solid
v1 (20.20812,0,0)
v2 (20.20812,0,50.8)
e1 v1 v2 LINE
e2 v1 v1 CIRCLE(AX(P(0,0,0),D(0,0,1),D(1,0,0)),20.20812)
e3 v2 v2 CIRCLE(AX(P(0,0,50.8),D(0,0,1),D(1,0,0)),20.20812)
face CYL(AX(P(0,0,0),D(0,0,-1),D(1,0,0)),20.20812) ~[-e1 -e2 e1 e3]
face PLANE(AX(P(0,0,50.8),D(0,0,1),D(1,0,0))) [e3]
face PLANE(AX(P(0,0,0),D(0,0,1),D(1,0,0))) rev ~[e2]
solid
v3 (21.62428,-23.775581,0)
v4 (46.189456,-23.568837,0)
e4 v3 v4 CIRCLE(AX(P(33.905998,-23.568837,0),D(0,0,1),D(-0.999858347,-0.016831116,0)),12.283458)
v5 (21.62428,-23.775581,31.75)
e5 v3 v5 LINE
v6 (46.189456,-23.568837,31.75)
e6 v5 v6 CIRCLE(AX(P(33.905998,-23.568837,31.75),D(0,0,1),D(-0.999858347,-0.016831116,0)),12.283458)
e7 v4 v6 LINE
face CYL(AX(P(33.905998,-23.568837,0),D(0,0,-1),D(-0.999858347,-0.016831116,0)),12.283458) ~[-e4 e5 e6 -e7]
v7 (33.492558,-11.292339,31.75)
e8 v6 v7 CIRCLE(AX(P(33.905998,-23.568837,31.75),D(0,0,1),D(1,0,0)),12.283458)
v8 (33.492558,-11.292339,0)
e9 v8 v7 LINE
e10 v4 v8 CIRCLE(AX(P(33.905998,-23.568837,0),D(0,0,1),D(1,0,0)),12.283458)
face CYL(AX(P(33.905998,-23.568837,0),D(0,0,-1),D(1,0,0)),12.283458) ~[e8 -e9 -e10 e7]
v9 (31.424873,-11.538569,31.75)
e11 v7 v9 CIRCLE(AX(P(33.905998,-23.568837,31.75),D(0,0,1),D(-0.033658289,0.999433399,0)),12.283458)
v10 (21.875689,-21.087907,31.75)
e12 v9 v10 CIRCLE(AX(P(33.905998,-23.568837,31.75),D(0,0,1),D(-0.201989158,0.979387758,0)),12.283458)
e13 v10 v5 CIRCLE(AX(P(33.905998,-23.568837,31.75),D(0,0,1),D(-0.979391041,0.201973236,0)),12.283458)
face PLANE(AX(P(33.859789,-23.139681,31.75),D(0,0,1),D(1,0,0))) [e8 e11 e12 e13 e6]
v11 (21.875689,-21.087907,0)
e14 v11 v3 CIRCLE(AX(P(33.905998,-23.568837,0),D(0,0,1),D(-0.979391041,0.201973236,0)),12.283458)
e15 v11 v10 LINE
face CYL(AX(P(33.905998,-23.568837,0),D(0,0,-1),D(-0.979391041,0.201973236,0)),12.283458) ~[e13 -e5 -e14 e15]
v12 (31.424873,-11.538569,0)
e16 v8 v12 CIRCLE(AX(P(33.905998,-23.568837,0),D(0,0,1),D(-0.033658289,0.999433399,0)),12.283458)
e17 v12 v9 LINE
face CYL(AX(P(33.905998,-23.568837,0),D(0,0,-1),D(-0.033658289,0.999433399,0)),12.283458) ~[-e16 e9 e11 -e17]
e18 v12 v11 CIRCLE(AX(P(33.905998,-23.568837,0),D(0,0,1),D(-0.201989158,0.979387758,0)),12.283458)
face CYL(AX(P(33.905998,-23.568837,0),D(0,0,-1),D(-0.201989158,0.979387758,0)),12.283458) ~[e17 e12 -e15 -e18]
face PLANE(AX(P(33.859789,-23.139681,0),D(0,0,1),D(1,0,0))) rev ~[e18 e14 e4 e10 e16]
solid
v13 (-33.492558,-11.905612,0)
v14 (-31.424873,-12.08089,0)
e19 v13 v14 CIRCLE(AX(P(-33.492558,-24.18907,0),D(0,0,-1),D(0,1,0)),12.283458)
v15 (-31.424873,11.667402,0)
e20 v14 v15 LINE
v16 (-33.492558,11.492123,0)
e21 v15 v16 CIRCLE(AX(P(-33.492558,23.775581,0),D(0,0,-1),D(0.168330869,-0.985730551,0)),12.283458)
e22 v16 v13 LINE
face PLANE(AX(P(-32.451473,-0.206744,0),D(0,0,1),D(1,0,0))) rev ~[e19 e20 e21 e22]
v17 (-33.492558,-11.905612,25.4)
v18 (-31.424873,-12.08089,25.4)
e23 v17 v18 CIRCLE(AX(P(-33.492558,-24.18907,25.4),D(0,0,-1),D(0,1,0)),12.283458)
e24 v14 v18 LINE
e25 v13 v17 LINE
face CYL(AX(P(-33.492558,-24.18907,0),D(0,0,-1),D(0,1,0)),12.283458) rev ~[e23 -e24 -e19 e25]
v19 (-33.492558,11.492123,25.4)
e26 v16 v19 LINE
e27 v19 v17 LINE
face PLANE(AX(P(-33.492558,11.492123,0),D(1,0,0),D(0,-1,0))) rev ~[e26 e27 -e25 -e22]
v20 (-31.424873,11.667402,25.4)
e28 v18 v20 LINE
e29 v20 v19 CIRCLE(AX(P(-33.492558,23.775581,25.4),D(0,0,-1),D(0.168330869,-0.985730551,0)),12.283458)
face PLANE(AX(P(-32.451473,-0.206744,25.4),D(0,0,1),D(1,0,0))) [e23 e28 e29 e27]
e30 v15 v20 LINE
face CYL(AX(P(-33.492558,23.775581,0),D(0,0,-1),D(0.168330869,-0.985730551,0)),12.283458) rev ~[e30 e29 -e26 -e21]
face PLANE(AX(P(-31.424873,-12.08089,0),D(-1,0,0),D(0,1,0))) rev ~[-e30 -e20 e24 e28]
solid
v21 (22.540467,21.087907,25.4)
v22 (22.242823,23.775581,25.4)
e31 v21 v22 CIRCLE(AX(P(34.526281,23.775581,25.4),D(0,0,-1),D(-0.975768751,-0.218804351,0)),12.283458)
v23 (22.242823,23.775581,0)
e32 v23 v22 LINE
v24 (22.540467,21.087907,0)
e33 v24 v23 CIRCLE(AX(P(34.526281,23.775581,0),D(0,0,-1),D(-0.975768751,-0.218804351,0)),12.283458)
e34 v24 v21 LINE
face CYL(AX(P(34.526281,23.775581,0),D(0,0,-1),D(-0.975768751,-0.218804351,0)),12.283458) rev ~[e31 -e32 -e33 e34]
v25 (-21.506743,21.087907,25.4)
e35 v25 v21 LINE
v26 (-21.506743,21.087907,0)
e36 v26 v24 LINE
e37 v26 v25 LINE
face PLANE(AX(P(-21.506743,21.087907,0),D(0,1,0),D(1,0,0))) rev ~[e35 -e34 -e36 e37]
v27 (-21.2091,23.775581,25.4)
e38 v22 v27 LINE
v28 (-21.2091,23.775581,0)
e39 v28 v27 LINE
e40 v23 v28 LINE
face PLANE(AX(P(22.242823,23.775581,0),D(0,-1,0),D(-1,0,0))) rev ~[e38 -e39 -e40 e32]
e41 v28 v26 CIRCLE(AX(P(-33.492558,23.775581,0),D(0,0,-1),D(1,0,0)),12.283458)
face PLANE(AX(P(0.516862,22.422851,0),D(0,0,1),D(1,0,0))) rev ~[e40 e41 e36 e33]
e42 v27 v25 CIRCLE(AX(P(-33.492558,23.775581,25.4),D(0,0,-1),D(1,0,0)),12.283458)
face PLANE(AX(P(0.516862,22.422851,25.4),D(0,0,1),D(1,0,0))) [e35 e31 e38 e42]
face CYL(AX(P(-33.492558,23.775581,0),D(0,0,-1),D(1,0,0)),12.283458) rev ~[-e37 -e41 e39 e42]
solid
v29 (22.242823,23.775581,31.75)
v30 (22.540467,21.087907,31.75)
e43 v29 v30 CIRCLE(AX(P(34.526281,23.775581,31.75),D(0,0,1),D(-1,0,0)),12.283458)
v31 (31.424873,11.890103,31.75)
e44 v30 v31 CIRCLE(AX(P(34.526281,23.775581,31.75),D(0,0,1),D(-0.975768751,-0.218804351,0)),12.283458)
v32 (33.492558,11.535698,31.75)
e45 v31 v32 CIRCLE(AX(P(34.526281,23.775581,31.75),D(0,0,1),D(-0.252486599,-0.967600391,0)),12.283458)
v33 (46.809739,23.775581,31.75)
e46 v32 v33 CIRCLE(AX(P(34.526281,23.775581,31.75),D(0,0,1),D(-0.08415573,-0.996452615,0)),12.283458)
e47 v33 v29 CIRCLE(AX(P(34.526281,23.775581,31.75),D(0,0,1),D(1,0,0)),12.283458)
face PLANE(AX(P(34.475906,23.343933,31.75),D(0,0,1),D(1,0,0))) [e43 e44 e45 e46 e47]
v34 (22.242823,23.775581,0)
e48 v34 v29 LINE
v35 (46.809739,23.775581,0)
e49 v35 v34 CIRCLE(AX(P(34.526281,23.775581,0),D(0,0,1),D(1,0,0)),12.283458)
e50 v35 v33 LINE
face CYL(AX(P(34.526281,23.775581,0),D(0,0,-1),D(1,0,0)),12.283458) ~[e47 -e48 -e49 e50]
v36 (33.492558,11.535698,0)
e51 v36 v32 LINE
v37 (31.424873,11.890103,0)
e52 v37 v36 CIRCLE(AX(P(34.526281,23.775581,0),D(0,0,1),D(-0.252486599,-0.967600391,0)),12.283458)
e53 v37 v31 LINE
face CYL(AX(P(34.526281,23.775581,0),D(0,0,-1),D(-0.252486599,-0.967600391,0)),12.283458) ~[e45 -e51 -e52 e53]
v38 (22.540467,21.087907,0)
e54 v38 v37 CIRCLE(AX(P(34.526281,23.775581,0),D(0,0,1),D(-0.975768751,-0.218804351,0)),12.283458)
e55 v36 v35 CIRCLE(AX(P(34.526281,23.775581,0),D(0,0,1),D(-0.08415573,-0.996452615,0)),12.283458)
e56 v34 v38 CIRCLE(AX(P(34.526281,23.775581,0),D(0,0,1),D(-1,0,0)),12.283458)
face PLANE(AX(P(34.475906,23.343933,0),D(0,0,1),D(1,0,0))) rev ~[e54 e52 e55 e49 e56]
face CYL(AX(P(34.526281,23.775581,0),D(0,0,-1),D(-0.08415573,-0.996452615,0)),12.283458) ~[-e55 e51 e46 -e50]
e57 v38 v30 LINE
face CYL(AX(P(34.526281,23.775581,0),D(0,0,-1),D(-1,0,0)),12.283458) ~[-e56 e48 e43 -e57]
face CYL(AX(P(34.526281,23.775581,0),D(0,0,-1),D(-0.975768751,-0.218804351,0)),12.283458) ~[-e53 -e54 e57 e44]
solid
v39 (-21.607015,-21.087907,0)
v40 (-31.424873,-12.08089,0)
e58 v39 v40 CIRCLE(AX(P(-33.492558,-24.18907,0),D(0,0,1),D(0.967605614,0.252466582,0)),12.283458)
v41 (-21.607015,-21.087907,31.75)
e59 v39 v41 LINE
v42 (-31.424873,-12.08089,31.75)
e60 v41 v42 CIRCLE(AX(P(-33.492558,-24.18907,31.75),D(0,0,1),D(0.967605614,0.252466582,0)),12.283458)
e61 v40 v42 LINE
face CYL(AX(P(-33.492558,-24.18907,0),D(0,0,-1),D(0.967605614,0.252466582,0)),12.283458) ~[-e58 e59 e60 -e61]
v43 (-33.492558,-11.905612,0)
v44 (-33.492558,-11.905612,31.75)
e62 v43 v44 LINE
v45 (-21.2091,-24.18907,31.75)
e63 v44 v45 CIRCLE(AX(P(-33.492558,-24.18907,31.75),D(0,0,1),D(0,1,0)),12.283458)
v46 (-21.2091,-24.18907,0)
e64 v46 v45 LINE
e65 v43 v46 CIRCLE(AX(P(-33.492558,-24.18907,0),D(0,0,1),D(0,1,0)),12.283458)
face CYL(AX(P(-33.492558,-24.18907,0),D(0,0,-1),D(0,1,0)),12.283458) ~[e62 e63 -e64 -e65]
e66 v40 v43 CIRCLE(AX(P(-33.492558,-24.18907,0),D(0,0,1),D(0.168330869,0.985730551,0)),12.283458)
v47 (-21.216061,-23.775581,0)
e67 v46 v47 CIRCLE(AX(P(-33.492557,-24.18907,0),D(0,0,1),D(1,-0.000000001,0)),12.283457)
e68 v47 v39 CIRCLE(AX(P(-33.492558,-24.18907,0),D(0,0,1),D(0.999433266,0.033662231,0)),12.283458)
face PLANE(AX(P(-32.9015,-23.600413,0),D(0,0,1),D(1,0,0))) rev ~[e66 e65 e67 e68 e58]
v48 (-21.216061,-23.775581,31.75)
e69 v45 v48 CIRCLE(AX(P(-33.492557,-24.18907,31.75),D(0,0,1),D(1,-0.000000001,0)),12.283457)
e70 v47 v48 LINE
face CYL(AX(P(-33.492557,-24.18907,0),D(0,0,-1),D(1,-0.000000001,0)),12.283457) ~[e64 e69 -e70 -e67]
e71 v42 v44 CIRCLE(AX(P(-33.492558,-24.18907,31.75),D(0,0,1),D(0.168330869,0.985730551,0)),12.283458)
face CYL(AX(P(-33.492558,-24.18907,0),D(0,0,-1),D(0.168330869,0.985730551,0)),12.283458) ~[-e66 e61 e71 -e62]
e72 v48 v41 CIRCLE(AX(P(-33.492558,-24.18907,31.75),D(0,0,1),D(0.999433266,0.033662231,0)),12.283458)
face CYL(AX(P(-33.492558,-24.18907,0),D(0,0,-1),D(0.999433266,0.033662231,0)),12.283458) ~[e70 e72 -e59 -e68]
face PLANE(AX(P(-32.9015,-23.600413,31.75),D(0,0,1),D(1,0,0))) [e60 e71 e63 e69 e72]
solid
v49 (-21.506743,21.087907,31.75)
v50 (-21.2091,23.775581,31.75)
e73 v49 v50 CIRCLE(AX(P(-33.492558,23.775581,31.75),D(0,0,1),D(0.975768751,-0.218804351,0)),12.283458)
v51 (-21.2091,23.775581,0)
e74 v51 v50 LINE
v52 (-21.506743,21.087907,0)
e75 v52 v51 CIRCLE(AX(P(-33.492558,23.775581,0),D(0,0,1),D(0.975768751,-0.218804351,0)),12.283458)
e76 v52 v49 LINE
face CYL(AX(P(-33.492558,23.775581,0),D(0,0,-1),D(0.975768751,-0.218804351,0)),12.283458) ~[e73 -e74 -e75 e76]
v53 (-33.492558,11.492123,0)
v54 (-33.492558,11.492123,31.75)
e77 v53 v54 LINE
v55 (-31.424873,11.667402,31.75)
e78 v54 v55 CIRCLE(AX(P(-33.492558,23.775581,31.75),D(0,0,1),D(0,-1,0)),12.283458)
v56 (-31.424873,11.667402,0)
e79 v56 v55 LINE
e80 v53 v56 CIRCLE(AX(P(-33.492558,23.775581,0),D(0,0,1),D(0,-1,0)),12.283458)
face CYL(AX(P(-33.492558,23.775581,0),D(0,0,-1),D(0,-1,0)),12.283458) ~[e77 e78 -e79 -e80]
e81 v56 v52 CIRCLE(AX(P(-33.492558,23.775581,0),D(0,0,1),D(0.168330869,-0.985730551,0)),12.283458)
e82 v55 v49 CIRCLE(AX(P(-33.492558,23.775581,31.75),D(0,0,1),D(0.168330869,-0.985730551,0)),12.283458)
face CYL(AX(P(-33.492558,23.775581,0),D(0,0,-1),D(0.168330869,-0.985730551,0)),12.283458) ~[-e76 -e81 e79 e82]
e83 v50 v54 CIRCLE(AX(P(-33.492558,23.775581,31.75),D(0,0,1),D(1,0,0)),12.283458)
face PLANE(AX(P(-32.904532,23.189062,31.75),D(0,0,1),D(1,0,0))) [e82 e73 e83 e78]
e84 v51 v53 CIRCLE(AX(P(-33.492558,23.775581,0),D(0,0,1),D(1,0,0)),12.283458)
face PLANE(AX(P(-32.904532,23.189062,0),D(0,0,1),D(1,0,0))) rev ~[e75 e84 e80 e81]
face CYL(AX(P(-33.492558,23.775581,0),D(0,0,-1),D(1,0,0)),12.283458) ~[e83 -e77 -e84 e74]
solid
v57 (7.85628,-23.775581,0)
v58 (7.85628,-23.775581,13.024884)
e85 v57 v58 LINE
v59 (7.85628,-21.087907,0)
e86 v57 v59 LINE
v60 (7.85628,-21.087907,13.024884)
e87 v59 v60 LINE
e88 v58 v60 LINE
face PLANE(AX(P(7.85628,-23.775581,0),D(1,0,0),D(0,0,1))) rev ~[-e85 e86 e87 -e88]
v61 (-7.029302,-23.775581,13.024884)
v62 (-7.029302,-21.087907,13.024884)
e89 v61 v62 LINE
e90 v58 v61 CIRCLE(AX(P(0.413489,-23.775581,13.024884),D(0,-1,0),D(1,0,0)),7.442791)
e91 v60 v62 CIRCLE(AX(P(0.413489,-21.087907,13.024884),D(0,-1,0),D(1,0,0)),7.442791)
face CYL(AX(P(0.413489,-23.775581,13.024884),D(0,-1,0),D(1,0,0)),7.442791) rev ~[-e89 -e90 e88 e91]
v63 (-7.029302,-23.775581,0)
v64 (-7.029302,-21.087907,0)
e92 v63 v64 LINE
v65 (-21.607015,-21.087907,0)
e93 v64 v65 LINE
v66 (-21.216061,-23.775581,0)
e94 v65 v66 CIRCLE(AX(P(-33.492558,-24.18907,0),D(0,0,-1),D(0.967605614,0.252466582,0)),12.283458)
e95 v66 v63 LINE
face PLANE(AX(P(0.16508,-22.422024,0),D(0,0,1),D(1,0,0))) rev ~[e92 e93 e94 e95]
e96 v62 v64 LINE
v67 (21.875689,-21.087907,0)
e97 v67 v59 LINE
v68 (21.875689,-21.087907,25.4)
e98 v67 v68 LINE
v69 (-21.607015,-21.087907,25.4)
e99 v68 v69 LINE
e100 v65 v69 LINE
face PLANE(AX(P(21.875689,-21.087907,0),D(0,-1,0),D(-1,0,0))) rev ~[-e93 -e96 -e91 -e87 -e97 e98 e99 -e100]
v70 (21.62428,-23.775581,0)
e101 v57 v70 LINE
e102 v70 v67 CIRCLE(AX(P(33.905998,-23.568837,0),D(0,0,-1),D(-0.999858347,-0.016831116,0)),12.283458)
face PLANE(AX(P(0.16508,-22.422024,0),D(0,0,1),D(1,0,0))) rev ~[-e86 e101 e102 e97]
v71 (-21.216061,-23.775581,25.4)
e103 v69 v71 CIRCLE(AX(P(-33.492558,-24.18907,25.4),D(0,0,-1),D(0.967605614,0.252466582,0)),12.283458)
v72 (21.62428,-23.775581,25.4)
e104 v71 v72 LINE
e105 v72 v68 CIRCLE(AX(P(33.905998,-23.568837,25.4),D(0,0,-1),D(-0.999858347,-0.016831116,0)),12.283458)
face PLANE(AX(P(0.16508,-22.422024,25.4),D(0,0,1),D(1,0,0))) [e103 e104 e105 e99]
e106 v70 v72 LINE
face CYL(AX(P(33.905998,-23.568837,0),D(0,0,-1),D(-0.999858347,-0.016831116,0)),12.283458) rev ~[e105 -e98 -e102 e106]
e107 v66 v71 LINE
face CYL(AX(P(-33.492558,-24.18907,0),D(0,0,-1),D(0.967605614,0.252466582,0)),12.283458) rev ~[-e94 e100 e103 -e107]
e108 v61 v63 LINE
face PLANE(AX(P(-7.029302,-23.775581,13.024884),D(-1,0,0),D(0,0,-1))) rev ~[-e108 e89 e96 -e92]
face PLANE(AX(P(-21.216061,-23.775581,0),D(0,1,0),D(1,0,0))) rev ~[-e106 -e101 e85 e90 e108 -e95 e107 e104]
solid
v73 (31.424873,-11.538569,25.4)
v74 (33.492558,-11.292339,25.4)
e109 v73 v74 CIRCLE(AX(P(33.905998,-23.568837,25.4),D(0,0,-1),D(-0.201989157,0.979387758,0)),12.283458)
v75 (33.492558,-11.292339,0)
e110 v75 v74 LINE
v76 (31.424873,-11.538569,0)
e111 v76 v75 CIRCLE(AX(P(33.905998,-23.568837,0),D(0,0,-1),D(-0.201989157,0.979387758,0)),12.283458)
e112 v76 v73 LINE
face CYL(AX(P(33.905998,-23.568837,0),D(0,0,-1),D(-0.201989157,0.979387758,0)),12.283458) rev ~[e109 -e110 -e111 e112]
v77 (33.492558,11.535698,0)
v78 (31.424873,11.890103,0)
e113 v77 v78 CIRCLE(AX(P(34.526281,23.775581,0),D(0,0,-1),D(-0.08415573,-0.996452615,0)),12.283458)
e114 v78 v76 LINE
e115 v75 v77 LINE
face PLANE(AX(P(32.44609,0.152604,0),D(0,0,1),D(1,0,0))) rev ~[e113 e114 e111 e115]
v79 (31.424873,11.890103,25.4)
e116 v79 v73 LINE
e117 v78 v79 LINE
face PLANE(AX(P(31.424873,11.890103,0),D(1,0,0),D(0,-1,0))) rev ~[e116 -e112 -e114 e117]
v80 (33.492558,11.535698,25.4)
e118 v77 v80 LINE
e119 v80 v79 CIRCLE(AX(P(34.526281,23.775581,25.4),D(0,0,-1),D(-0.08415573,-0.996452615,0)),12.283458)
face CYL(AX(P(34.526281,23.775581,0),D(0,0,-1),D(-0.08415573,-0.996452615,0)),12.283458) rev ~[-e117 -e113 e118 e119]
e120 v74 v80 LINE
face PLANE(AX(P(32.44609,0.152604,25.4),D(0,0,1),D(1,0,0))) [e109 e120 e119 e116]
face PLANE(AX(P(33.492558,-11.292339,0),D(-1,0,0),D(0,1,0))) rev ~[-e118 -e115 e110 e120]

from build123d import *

# Parameters (mm, degrees)
F1_DEPTH = 25.4
F2_DEPTH = 31.75
F0_R     = 20.2081200016
F3_DEPTH = 50.8
F5_DEPTH = 25.4


with BuildPart() as f1:
    # F0 (on Top) → F1 (new body)
    with BuildSketch(Plane.XY):
        with BuildLine():
            Line((22.2428232494, 23.7755812705), (-21.2090998951, 23.7755812705))
            ThreePointArc((-21.2090998951, 23.7755812705), (-21.2837375348, 22.4235288232), (-21.5067434167, 21.0879072547))
            Line((-21.5067434167, 21.0879072547), (22.5404667711, 21.0879072547))
            ThreePointArc((22.5404667711, 21.0879072547), (22.3174608892, 22.4235288232), (22.2428232494, 23.7755812705))
        make_face()
    extrude(amount=F1_DEPTH)


with BuildPart() as f1b:
    # F0 (on Top) → F1, piece 2 (new body)
    with BuildSketch(Plane.XY):
        with BuildLine():
            Line((33.4925577044, -11.2923389787), (33.4925577044, 11.5356976198))
            ThreePointArc((33.4925577044, 11.5356976198), (32.4511353861, 11.6686780251), (31.4248725772, 11.8901026859))
            Line((31.4248725772, 11.8901026859), (31.4248725772, -11.5385687696))
            ThreePointArc((31.4248725772, -11.5385687696), (32.4534881194, -11.3715605888), (33.4925577044, -11.2923389787))
        make_face()
    extrude(amount=F1_DEPTH)


with BuildPart() as f1c:
    # F0 (on Top) → F1, piece 3 (new body)
    with BuildSketch(Plane.XY):
        with BuildLine():
            Line((21.8756893355, -21.0879072547), (-21.6070149652, -21.0879072547))
            ThreePointArc((-21.6070149652, -21.0879072547), (-21.3370268115, -22.4209057163), (-21.2160613421, -23.7755812705))
            Line((-21.2160613421, -23.7755812705), (21.6242800548, -23.7755812705))
            ThreePointArc((21.6242800548, -23.7755812705), (21.675930241, -22.4248170917), (21.8756893355, -21.0879072547))
        make_face()
    extrude(amount=F1_DEPTH)

    # F4 (on face) → F5 (cut)
    with BuildSketch(Plane.XZ.offset(23.7755812705)):
        with BuildLine():
            Line((-7.0293024182, 13.0248842761), (-7.0293024182, 0))
            Line((-7.0293024182, 0), (7.8562796116, 0))
            Line((7.8562796116, 0), (7.8562796116, 13.0248842761))
            ThreePointArc((7.8562796116, 13.0248842761), (0.4134885967, 20.467675291), (-7.0293024182, 13.0248842761))
        make_face()
    extrude(amount=-F5_DEPTH, mode=Mode.SUBTRACT)


with BuildPart() as f1d:
    # F0 (on Top) → F1, piece 4 (new body)
    with BuildSketch(Plane.XY):
        with BuildLine():
            ThreePointArc((-31.4248725772, 11.6674016398), (-32.4550071966, 11.5360214459), (-33.4925577044, 11.4921234611))
            Line((-33.4925577044, 11.4921234611), (-33.4925577044, -11.9056120578))
            ThreePointArc((-33.4925577044, -11.9056120578), (-32.4550071966, -11.9495100426), (-31.4248725772, -12.0808902364))
            Line((-31.4248725772, -12.0808902364), (-31.4248725772, 11.6674016398))
        make_face()
    extrude(amount=F1_DEPTH)


with BuildPart() as f2:
    # F0 (on Top) → F2 (new body)
    with BuildSketch(Plane.XY):
        with BuildLine():
            ThreePointArc((-21.5067434167, 21.0879072547), (-21.2837375348, 22.4235288232), (-21.2090998951, 23.7755812705))
            ThreePointArc((-21.2090998951, 23.7755812705), (-42.1782740179, 32.4612975839), (-33.4925577044, 11.4921234611))
            ThreePointArc((-33.4925577044, 11.4921234611), (-32.4550071966, 11.5360214459), (-31.4248725772, 11.6674016398))
            ThreePointArc((-31.4248725772, 11.6674016398), (-25.0331432471, 14.8693114119), (-21.5067434167, 21.0879072547))
        make_face()
    extrude(amount=F2_DEPTH)


with BuildPart() as f2b:
    # F0 (on Top) → F2, piece 2 (new body)
    with BuildSketch(Plane.XY):
        with BuildLine():
            ThreePointArc((-31.4248725772, -12.0808902364), (-32.4550071966, -11.9495100426), (-33.4925577044, -11.9056120578))
            ThreePointArc((-33.4925577044, -11.9056120578), (-42.1782740179, -32.8747861806), (-21.2090998951, -24.1890698671))
            ThreePointArc((-21.2090998951, -24.1890698671), (-21.2108403801, -23.9822962703), (-21.2160613421, -23.7755812705))
            ThreePointArc((-21.2160613421, -23.7755812705), (-21.3370268115, -22.4209057163), (-21.6070149652, -21.0879072547))
            ThreePointArc((-21.6070149652, -21.0879072547), (-25.1886591703, -15.137627723), (-31.4248725772, -12.0808902364))
        make_face()
    extrude(amount=F2_DEPTH)


with BuildPart() as f2c:
    # F0 (on Top) → F2, piece 3 (new body)
    with BuildSketch(Plane.XY):
        with BuildLine():
            ThreePointArc((46.8097388682, 23.7755812705), (34.5262810588, 36.0590390798), (22.2428232494, 23.7755812705))
            ThreePointArc((22.2428232494, 23.7755812705), (22.3174608892, 22.4235288232), (22.5404667711, 21.0879072547))
            ThreePointArc((22.5404667711, 21.0879072547), (25.6913518036, 15.2416864498), (31.4248725772, 11.8901026859))
            ThreePointArc((31.4248725772, 11.8901026859), (32.4511353861, 11.6686780251), (33.4925577044, 11.5356976198))
            ThreePointArc((33.4925577044, 11.5356976198), (42.8384901077, 14.7317703214), (46.8097388682, 23.7755812705))
        make_face()
    extrude(amount=F2_DEPTH)


with BuildPart() as f2d:
    # F0 (on Top) → F2, piece 4 (new body)
    with BuildSketch(Plane.XY):
        with BuildLine():
            ThreePointArc((46.1894556817, -23.5688369721), (42.4442898823, -14.7381571961), (33.4925577044, -11.2923389787))
            ThreePointArc((33.4925577044, -11.2923389787), (32.4534881194, -11.3715605888), (31.4248725772, -11.5385687696))
            ThreePointArc((31.4248725772, -11.5385687696), (25.2202109569, -14.8831912613), (21.8756893355, -21.0879072547))
            ThreePointArc((21.8756893355, -21.0879072547), (21.675930241, -22.4248170917), (21.6242800548, -23.7755812705))
            ThreePointArc((21.6242800548, -23.7755812705), (34.0093736825, -35.8518597758), (46.1894556817, -23.5688369721))
        make_face()
    extrude(amount=F2_DEPTH)


with BuildPart() as f3:
    # F0 (on Top) → F3 (new body)
    with BuildSketch(Plane.XY):
        Circle(F0_R)
    extrude(amount=F3_DEPTH)


solid = Compound([f1.part, f1b.part, f1c.part, f1d.part, f2.part, f2b.part, f2c.part, f2d.part, f3.part])
